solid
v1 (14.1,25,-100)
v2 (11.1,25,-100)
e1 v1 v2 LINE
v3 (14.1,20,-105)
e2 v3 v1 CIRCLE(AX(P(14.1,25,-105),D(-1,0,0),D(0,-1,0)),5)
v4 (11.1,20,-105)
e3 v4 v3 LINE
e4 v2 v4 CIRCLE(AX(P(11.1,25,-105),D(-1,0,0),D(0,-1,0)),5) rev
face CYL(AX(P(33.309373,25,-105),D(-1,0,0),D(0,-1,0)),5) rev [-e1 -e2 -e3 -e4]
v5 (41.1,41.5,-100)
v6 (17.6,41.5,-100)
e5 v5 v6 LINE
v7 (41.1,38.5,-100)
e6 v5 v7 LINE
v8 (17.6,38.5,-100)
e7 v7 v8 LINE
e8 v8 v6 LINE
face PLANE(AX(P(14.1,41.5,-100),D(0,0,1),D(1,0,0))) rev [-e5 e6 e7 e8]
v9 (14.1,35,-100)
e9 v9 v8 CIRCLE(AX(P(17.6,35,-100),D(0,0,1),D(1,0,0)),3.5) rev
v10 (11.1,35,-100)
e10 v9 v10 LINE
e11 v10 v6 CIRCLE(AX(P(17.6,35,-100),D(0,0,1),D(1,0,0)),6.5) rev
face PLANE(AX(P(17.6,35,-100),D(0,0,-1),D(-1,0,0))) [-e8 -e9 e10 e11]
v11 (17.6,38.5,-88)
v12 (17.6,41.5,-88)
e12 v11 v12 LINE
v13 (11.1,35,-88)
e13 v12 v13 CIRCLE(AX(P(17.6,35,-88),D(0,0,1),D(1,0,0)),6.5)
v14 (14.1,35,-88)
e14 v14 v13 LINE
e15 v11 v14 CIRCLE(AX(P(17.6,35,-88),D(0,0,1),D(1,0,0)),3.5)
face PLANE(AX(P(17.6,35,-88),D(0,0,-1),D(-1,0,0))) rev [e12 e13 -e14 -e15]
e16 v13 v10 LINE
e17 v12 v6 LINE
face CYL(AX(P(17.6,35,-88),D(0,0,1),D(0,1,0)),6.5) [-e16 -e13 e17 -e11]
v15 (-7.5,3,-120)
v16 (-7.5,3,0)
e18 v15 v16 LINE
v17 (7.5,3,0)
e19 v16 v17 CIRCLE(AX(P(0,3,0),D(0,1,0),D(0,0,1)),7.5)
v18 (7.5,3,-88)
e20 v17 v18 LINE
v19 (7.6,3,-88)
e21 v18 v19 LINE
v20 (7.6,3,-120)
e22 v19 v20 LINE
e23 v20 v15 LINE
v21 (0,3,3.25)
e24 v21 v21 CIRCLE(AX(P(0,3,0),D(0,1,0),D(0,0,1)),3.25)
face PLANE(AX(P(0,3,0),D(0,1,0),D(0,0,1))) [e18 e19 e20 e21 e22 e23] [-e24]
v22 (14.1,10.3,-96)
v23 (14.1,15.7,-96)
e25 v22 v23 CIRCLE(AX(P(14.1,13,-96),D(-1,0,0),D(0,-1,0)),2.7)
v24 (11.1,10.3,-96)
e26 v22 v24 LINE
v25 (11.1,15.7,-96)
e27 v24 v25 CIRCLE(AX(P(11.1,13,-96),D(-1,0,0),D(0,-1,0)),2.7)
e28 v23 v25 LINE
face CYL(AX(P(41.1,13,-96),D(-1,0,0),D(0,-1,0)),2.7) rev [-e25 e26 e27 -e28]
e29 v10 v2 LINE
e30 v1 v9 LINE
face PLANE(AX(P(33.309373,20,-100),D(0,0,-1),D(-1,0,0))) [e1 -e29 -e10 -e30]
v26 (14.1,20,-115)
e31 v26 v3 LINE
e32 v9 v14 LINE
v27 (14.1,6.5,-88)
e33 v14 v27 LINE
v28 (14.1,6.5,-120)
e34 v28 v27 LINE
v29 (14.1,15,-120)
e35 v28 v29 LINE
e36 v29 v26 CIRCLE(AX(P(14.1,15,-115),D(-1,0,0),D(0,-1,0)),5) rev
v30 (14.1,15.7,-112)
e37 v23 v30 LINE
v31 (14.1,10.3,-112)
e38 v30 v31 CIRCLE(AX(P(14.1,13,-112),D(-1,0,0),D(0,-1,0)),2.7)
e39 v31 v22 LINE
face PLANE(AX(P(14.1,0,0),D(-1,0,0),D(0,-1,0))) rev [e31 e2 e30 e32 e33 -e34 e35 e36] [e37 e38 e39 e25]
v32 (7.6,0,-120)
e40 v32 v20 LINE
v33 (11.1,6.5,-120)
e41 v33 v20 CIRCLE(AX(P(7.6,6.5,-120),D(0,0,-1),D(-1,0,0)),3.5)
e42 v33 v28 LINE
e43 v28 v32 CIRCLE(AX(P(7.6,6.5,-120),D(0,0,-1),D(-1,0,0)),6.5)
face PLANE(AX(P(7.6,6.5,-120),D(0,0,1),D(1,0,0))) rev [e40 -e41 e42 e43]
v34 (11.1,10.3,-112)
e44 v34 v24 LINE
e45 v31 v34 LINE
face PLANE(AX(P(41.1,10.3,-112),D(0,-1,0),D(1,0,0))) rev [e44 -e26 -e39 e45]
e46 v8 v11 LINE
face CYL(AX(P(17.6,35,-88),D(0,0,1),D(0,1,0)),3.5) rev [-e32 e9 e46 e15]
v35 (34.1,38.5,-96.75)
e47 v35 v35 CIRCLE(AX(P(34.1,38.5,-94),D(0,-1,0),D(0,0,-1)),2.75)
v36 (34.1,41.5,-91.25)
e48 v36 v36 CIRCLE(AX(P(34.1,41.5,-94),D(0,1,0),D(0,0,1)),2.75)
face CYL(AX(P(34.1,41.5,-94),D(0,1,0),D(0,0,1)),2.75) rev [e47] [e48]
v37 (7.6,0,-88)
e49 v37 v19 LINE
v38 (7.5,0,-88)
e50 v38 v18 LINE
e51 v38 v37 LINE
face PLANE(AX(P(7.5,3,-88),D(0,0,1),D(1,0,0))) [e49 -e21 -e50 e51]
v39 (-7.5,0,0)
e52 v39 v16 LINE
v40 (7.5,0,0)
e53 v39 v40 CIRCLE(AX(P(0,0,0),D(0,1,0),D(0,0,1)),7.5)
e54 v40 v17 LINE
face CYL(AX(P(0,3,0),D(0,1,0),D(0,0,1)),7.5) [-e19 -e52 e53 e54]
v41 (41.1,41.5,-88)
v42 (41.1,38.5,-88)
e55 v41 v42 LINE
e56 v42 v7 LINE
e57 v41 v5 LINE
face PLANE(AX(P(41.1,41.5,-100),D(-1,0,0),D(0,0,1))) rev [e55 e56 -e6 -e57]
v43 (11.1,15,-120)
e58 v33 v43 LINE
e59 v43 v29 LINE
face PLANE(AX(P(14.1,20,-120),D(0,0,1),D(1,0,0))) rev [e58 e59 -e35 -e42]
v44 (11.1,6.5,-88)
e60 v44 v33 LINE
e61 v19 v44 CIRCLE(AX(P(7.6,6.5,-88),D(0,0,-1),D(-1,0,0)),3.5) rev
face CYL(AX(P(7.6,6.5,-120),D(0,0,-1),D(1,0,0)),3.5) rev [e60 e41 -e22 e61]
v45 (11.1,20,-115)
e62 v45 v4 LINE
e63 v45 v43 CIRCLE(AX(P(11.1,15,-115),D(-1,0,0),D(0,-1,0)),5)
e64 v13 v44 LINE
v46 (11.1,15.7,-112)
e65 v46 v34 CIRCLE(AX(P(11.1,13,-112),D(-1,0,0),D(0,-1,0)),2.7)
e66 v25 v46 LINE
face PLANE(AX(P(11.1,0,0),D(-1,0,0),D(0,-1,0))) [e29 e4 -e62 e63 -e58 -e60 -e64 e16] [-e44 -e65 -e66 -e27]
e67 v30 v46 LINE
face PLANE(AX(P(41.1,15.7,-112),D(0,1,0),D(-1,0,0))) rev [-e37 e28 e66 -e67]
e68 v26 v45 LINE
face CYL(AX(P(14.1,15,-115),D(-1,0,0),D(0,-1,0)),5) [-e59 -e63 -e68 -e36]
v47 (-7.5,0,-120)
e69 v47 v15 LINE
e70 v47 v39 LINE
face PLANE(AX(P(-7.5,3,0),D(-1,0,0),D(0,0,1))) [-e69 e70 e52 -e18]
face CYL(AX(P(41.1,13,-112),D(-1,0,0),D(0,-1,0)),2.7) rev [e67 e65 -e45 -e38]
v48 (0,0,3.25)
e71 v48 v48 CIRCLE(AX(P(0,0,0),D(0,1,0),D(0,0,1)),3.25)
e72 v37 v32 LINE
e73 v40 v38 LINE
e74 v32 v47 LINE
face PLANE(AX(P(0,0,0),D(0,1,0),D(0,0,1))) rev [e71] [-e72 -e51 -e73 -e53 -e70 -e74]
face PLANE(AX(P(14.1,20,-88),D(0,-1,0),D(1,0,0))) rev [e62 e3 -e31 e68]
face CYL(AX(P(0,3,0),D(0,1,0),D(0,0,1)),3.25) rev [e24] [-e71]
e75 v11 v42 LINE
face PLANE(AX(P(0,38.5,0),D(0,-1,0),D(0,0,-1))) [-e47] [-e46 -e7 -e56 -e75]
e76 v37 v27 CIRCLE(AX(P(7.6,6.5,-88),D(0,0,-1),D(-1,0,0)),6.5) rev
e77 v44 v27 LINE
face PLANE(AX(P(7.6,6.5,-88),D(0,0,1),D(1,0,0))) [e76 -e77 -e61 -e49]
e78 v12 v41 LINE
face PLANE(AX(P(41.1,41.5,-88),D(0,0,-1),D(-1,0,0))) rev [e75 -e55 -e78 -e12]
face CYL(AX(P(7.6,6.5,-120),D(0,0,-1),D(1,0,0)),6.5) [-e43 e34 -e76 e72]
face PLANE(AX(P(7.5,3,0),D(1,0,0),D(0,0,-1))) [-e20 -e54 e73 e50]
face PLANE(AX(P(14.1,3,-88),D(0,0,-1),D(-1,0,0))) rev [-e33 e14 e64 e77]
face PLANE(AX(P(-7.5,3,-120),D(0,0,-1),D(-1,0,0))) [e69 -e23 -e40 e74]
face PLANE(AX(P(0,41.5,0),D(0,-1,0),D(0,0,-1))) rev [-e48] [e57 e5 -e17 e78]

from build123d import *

# Parameters (mm, degrees)
SKETCH1_R            = 3.25
BOSS_EXTRUDE1_DEPTH  = 3
EDGE_FLANGE1_DEPTH   = 32
SKETCH12_W           = 12
SKETCH12_H           = 15
BOSS_EXTRUDE2_DEPTH  = 3
EDGE_FLANGE3_DEPTH   = 12
CUT_EXTRUDE1_DEPTH   = 131.469345059
FILLET1_R            = 5
M5_CLEARANCE_HOLE1_D = 5.5


# Sheet-metal steps are written as plain solids
with BuildPart() as part:
    # Sketch1 → Boss-Extrude1 (new body)
    with BuildSketch(Plane(origin=(0, 0, 0), x_dir=(1, 0, 0), z_dir=(0, 1, 0))):
        with BuildLine():
            Line((-7.5, 0), (-7.5, 120))
            Line((-7.5, 120), (7.6, 120))
            Line((7.6, 120), (7.6, 88))
            Line((7.6, 88), (7.5, 88))
            Line((7.5, 88), (7.5, 0))
            ThreePointArc((7.5, 0), (0, -7.5), (-7.5, 0))
        make_face()
        with Locations(Location((0, 0, 0), (0, 0, 270))):
            Circle(SKETCH1_R, mode=Mode.SUBTRACT)
    extrude(amount=BOSS_EXTRUDE1_DEPTH)

    # Edge-Flange1 section (across the edge) → Edge-Flange1 (add)
    with BuildSketch(Plane(origin=(11.1, 3, -88), x_dir=(-1, 0, 0), z_dir=(0, 0, -1))):
        with BuildLine():
            Line((-3, 3.5), (-3, 17))
            Line((-3, 17), (0, 17))
            Line((0, 17), (0, 3.5))
            ThreePointArc((0, 3.5), (1.025126266, 1.025126266), (3.5, 0))
            Line((3.5, 0), (3.5, -3))
            ThreePointArc((3.5, -3), (-1.096194078, -1.096194078), (-3, 3.5))
        make_face()
    extrude(amount=EDGE_FLANGE1_DEPTH)

    # Sketch12 → Boss-Extrude2 (add)
    with BuildSketch(Plane.ZY.offset(-11.1)):
        with Locations((-94, 27.5)):
            Rectangle(SKETCH12_W, SKETCH12_H)
    extrude(amount=-BOSS_EXTRUDE2_DEPTH)

    # Edge-Flange3 section (across the edge) → Edge-Flange3 (add)
    with BuildSketch(Plane(origin=(14.1, 38.5, -100), x_dir=(0, -1, 0), z_dir=(0, 0, 1))):
        with BuildLine():
            Line((-3, 3.5), (-3, 27))
            Line((-3, 27), (0, 27))
            Line((0, 27), (0, 3.5))
            ThreePointArc((0, 3.5), (1.025126266, 1.025126266), (3.5, 0))
            Line((3.5, 0), (3.5, -3))
            ThreePointArc((3.5, -3), (-1.096194078, -1.096194078), (-3, 3.5))
        make_face()
    extrude(amount=EDGE_FLANGE3_DEPTH)

    # Sketch16 → Cut-Extrude1 (cut, through all)
    with BuildSketch(Plane.ZY.offset(-11.1)):
        with BuildLine():
            Line((-112, 15.7), (-96, 15.7))
            ThreePointArc((-96, 15.7), (-93.3, 13), (-96, 10.3))
            Line((-96, 10.3), (-112, 10.3))
            ThreePointArc((-112, 10.3), (-114.7, 13), (-112, 15.7))
        make_face()
    extrude(amount=-CUT_EXTRUDE1_DEPTH, mode=Mode.SUBTRACT)

    # Fillet1
    fillet1_edges = [part.edges().sort_by_distance(p)[0] for p in [
        (12.6, 20, -120),
        (12.6, 20, -100),
    ]]
    fillet(fillet1_edges, radius=FILLET1_R)

    # M5 Clearance Hole1 (through all)
    with Locations(Plane(origin=(0, 41.5, 0), x_dir=(1, 0, 0), z_dir=(0, 1, 0))):
        with Locations((34.1, 94)):
            Hole(M5_CLEARANCE_HOLE1_D / 2)


solid = part.part
